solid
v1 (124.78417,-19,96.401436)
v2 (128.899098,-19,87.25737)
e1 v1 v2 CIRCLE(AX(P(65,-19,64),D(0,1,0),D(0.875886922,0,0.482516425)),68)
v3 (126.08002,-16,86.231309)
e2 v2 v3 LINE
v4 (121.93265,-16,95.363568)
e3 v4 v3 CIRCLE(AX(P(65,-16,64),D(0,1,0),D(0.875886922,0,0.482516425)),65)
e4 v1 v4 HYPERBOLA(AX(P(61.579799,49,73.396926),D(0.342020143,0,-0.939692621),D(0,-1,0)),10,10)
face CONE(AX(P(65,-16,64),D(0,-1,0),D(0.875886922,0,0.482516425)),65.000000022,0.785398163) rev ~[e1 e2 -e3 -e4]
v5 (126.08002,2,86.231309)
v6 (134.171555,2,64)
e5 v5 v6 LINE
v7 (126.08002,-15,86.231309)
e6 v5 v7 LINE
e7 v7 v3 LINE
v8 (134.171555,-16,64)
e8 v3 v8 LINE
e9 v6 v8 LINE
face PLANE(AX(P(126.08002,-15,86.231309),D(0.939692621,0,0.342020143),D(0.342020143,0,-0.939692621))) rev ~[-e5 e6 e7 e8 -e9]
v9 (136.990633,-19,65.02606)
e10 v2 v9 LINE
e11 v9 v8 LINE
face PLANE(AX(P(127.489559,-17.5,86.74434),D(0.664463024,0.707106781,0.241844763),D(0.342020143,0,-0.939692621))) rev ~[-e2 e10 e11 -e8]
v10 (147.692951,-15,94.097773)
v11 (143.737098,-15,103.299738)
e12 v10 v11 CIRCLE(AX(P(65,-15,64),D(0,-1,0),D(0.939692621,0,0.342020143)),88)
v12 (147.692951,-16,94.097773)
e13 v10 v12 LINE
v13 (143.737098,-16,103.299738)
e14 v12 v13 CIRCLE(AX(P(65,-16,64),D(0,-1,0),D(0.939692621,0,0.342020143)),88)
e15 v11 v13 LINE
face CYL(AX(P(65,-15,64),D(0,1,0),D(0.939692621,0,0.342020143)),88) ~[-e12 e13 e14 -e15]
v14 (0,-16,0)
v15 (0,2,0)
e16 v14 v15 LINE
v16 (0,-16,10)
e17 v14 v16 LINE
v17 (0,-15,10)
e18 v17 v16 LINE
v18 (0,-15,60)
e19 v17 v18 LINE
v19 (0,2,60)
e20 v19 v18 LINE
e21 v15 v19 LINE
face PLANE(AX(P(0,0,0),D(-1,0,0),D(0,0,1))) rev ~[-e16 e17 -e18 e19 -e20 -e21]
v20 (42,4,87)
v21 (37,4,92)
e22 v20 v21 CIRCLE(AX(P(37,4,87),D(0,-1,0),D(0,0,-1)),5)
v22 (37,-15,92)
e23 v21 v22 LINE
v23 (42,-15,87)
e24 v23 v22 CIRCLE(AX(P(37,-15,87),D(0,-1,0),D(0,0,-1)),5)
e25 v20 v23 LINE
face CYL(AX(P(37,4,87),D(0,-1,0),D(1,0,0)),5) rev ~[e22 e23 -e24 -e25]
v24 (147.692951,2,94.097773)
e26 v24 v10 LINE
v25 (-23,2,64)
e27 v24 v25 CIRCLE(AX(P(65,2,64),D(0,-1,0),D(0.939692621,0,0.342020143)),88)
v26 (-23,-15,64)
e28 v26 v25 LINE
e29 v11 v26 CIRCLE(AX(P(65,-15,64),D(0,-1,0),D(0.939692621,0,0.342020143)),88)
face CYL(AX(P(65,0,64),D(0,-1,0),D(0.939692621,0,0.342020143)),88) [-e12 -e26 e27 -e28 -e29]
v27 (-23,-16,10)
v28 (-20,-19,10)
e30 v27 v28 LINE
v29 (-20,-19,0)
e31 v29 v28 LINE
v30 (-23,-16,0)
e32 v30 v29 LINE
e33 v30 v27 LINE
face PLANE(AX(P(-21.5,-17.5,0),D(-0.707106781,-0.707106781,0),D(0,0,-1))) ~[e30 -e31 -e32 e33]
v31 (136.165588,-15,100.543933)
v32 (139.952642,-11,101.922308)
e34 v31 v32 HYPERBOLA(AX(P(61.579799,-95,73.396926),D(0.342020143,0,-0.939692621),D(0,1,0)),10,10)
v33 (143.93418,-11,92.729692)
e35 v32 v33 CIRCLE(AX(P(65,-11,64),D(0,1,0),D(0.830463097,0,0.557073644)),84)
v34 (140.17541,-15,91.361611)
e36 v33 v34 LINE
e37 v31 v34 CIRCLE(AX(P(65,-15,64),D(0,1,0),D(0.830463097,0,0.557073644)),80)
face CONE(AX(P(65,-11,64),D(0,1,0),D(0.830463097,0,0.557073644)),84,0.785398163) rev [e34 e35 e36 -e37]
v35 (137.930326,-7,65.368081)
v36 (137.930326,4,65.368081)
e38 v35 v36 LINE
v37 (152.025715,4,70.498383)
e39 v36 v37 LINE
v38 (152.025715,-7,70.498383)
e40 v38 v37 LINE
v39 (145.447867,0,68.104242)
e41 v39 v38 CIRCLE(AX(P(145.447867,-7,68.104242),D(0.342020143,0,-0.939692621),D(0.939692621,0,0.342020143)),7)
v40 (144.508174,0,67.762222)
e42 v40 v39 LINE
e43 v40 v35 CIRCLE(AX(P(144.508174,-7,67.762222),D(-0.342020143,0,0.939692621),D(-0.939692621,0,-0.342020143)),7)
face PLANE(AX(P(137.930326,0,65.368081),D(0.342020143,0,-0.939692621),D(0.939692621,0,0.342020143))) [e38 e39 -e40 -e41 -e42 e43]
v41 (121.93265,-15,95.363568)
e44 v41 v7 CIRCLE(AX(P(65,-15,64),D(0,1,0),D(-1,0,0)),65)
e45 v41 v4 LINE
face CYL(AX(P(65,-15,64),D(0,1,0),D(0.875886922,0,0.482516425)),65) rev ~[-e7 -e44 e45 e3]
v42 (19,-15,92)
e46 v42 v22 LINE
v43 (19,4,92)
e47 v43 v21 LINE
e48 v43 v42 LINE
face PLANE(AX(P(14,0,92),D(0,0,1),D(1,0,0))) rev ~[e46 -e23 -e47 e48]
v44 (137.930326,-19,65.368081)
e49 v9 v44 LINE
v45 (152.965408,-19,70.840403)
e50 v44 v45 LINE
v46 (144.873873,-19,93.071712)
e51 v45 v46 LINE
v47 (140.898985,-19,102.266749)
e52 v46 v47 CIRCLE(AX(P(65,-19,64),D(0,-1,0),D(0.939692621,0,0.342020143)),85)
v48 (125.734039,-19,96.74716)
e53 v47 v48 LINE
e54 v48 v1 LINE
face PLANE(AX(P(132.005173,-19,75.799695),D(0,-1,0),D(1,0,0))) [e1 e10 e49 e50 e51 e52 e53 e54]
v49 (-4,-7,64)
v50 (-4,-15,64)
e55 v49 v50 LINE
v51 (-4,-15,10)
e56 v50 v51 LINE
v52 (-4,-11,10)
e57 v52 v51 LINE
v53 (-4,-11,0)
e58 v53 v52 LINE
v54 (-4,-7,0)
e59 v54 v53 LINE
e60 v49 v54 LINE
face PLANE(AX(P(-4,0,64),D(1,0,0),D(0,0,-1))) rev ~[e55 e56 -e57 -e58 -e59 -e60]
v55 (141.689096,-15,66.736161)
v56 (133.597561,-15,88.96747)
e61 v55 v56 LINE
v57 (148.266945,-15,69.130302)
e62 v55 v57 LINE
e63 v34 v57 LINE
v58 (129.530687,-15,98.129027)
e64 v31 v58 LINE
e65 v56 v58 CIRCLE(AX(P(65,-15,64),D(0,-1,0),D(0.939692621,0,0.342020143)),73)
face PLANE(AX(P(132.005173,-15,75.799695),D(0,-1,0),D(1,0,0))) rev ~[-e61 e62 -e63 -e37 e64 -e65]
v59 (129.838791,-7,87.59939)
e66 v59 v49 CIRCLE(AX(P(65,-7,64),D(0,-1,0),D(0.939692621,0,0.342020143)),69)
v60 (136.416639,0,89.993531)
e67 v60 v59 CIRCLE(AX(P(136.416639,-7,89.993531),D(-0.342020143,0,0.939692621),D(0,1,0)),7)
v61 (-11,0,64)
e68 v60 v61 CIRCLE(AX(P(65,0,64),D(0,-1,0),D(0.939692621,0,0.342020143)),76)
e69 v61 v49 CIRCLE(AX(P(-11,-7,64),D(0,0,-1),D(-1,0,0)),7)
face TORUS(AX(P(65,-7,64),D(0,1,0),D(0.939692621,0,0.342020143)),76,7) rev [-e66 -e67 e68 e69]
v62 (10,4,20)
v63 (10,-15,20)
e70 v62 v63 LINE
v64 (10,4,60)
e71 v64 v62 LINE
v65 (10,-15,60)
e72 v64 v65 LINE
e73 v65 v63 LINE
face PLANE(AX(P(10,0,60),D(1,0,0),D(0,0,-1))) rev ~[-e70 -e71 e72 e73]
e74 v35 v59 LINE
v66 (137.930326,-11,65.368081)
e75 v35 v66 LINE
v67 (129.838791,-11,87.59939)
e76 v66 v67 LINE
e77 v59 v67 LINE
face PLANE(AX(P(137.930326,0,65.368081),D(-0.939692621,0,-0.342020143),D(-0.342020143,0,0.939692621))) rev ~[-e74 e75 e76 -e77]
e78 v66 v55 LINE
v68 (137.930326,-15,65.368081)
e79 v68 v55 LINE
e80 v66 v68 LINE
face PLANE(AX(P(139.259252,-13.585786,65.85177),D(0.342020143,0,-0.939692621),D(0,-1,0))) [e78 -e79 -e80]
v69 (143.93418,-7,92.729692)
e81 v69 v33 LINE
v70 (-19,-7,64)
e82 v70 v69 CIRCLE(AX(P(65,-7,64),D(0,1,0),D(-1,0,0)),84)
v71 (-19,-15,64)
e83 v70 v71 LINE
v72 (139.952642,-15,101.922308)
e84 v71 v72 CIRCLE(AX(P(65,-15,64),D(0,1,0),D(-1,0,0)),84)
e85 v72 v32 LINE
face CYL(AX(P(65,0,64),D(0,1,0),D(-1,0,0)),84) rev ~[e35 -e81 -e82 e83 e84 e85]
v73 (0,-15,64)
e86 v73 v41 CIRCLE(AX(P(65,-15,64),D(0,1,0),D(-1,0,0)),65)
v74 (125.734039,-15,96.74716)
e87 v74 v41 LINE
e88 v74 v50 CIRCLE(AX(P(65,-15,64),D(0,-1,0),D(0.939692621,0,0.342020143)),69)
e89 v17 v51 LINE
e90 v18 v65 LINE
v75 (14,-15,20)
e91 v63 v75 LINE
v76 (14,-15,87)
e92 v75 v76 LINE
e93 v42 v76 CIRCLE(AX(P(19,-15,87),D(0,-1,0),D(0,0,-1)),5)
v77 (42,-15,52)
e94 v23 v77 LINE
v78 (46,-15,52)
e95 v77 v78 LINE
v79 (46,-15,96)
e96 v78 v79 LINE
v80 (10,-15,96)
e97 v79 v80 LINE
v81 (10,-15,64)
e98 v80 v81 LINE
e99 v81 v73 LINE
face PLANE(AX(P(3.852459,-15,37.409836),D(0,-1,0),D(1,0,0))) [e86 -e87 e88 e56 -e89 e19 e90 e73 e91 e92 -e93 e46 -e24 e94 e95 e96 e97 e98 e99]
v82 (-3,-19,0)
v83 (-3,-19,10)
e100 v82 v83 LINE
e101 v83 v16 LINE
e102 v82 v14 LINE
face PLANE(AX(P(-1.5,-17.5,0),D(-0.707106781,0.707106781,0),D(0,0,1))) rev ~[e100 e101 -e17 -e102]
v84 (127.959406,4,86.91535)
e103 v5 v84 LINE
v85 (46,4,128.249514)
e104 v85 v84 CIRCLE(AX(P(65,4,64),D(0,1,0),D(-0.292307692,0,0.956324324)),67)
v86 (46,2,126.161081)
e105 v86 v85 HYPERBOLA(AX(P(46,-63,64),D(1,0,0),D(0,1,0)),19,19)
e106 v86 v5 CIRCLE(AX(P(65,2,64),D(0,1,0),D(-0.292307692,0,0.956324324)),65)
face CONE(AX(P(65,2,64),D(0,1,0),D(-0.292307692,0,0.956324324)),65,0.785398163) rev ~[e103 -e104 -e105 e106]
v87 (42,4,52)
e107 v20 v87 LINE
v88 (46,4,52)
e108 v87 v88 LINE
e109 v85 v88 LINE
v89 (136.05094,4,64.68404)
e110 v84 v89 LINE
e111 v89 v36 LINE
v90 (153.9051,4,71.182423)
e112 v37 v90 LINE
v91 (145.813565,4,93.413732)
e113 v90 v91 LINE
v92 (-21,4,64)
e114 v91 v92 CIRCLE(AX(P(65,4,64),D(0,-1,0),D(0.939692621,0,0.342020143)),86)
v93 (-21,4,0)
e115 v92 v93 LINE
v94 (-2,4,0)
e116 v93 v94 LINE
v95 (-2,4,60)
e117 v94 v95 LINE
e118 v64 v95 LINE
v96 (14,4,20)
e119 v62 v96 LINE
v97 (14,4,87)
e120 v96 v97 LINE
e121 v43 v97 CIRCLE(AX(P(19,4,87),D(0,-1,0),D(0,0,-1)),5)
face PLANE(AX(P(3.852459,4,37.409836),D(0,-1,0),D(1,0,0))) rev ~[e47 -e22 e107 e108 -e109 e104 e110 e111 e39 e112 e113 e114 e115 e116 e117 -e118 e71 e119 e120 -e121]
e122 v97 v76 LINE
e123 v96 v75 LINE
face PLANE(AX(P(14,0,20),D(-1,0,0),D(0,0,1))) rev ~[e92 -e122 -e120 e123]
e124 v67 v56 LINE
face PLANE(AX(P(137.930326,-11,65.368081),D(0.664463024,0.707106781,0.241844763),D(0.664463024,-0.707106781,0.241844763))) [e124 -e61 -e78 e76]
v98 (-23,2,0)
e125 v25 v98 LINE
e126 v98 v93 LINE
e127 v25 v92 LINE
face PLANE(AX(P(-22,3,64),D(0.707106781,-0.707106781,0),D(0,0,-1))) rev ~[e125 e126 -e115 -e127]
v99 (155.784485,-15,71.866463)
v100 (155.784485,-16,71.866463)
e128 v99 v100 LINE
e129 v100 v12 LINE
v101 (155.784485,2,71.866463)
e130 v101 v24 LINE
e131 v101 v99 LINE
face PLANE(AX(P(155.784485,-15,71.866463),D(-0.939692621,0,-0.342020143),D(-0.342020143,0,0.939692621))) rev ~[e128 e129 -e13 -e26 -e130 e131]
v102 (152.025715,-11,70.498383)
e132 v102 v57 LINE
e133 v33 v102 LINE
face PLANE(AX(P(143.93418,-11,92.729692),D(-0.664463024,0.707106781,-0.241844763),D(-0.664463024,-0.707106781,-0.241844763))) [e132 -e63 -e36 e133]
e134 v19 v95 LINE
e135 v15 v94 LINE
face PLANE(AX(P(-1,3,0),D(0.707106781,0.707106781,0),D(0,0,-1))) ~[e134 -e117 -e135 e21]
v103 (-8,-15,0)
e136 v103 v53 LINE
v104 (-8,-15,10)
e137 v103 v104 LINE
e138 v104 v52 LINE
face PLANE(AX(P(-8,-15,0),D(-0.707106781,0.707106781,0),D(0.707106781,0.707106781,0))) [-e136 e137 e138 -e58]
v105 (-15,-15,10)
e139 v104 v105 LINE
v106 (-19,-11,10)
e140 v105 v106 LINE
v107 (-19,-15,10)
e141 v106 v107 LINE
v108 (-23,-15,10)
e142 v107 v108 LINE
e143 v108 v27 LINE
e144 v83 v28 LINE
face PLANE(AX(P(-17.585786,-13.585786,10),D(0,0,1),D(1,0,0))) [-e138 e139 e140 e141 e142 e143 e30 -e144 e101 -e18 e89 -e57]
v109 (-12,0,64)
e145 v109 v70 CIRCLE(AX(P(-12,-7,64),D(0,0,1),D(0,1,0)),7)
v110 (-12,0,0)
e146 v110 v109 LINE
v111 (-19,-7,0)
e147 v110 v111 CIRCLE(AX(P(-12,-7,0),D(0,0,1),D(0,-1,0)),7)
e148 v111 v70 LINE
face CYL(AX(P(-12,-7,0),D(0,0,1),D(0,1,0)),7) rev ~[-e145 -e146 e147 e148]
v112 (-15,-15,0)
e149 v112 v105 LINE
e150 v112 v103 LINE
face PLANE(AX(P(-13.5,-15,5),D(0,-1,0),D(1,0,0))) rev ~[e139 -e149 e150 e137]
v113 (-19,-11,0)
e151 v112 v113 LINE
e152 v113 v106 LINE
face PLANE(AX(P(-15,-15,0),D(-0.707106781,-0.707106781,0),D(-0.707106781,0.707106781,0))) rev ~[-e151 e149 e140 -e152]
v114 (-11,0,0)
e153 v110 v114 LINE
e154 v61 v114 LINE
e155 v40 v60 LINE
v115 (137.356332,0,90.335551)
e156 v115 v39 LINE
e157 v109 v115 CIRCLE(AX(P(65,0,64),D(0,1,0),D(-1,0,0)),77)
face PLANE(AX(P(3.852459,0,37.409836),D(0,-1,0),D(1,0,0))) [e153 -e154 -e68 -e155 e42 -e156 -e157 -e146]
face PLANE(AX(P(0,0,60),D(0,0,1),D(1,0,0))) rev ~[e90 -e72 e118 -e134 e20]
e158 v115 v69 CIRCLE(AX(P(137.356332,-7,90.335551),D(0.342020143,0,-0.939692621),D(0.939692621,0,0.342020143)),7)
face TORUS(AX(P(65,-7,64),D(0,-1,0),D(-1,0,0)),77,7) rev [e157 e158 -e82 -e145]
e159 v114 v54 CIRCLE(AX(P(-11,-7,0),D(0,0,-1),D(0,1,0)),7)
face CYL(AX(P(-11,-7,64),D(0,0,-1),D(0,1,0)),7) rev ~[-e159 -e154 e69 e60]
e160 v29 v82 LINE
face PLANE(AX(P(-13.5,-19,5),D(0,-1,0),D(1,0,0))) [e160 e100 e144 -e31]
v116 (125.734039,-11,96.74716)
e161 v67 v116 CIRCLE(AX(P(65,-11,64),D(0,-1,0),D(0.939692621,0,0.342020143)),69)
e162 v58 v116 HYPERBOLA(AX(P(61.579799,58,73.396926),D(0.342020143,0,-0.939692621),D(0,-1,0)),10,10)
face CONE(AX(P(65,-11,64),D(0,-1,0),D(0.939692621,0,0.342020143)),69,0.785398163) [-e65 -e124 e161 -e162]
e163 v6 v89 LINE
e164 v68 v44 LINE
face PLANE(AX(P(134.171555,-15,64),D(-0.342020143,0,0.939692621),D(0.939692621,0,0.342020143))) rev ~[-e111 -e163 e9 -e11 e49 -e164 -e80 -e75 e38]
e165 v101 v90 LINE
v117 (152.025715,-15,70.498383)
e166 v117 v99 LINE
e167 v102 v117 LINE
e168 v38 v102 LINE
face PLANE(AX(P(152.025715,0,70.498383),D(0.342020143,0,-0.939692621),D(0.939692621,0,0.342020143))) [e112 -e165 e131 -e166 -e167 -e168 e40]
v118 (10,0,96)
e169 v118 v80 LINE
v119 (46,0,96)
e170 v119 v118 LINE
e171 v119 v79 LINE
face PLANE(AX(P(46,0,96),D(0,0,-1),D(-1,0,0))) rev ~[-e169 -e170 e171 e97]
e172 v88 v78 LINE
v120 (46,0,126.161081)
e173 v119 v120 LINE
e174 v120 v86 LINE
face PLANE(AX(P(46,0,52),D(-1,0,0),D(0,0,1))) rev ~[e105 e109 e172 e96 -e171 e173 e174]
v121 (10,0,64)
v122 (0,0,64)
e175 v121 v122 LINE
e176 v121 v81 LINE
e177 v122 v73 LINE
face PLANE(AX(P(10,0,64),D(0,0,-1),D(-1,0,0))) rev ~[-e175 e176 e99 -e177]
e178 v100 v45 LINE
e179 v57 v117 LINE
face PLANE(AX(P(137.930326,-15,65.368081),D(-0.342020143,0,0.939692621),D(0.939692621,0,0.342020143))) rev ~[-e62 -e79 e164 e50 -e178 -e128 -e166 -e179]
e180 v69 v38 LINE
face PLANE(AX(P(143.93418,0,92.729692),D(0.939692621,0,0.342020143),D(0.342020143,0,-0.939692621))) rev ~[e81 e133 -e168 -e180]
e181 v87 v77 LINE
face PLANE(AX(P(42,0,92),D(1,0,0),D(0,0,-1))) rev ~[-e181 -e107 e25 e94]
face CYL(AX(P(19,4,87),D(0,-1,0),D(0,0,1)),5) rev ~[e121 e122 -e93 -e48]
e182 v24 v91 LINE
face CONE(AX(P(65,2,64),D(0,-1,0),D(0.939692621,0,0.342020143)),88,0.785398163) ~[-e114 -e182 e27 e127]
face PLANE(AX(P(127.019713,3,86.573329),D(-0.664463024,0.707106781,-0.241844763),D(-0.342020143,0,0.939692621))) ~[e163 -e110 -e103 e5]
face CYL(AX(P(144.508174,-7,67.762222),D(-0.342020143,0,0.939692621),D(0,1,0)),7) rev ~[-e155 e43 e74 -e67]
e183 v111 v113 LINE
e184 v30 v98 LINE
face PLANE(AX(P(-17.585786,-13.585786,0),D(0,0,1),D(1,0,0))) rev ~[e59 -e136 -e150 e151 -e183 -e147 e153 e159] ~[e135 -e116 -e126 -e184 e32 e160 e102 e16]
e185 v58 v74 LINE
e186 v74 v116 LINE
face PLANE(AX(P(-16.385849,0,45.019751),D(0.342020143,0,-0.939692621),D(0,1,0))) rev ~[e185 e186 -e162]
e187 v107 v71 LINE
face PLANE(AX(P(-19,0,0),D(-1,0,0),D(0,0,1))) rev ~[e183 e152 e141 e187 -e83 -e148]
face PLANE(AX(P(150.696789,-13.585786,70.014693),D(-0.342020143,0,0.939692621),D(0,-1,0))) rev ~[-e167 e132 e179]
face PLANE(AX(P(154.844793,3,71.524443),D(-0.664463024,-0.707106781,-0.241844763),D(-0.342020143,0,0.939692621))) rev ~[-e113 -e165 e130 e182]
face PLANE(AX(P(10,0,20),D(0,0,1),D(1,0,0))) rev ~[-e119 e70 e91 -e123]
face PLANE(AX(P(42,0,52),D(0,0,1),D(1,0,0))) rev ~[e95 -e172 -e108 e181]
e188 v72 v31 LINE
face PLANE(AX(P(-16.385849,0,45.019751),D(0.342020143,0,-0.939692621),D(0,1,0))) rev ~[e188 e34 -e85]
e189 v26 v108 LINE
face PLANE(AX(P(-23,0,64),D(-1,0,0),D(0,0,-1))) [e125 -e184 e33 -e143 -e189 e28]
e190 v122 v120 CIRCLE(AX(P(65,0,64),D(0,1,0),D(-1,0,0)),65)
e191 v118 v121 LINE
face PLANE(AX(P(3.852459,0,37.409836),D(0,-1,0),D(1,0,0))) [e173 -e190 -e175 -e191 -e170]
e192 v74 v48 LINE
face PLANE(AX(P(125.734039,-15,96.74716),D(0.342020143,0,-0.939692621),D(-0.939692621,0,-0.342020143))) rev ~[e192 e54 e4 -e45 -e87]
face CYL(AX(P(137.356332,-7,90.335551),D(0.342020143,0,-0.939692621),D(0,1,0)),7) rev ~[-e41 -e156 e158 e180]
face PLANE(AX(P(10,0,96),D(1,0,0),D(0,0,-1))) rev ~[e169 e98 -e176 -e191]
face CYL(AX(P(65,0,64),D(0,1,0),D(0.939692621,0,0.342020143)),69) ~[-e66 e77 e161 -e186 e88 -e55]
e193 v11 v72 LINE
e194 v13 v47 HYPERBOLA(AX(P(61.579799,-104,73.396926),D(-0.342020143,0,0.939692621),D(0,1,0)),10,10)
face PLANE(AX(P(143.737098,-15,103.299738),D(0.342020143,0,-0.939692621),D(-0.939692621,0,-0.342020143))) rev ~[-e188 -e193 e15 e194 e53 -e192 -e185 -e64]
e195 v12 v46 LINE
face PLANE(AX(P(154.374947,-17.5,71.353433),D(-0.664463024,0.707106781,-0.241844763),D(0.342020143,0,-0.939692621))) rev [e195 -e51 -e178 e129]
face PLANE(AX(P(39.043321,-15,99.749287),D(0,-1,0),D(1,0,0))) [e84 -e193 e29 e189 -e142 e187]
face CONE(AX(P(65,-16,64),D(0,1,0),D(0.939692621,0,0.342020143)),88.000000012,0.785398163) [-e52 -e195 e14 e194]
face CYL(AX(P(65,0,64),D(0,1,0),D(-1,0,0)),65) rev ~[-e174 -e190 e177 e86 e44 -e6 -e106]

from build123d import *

# Parameters (mm, degrees)
F1_DEPTH     = 4
F2_DEPTH     = 15
F3_R         = 7
F4_SIZE      = 2
F5_W         = 19
F5_H         = 10
F5_W_2       = 4
F6_DEPTH     = 4
F7_T1_DEPTH  = 10
F7_T3_DEPTH  = 23.6580652273
F7_T5_DEPTH  = 23.6580652273
F7_T10_ANGLE = 16.8749432134
F7_T15_ANGLE = 13.853661309
F8_SIZE      = 3
F9_R         = 5


# Not quite as in the source:
# - a fillet or chamfer that OpenCascade refuses, or shapes differently, is made with other operations: its cross-section is extruded or revolved along the edge and cut away or added


with BuildPart() as f1:
    # F0 (on Front) → F1 (new body)
    with BuildSketch(Plane.XZ):
        Polygon((0, 0), (0, 60), (10, 60), (10, 20), (14, 20), (14, 64), (10, 64), (0, 64), (-4, 64), (-4, 0), align=None)
        with BuildLine():
            Line((-19, 0), (-4, 0))
            Line((-4, 0), (-4, 64))
            ThreePointArc((-4, 64), (53.018275741, 131.9517349578), (129.8387908342, 87.5993898895))
            Line((129.8387908342, 87.5993898895), (143.934180146, 92.7296920394))
            ThreePointArc((143.934180146, 92.7296920394), (50.413553076, 146.723851253), (-19, 64))
            Line((-19, 64), (-19, 0))
        make_face()
        with BuildLine():
            ThreePointArc((129.8387908342, 87.5993898895), (53.018275741, 131.9517349578), (-4, 64))
            Line((-4, 64), (0, 64))
            ThreePointArc((0, 64), (12.7505980895, 102.6652298584), (46, 126.1610810717))
            ThreePointArc((46, 126.1610810717), (94.0048047106, 122.1697627956), (126.0800203511, 86.2313093162))
            Line((126.0800203511, 86.2313093162), (129.8387908342, 87.5993898895))
        make_face()
        with BuildLine():
            Line((-23, 0), (-19, 0))
            Line((-19, 0), (-19, 64))
            ThreePointArc((-19, 64), (50.413553076, 146.723851253), (143.934180146, 92.7296920394))
            Line((143.934180146, 92.7296920394), (147.6929506292, 94.0977726127))
            ThreePointArc((147.6929506292, 94.0977726127), (49.7189603653, 150.6630822651), (-23, 64))
            Line((-23, 64), (-23, 0))
        make_face()
        Polygon((10, 64), (14, 64), (14, 92), (42, 92), (42, 52), (46, 52), (46, 92), (46, 96), (10, 96), (10, 92), align=None)
        with BuildLine():
            ThreePointArc((46, 126.1610810717), (12.7505980895, 102.6652298584), (0, 64))
            Line((0, 64), (10, 64))
            Line((10, 64), (10, 92))
            Line((10, 92), (10, 96))
            Line((10, 96), (46, 96))
            Line((46, 96), (46, 126.1610810717))
        make_face()
        Polygon((137.9303256941, 65.3680805733), (129.8387908342, 87.5993898895), (126.0800203511, 86.2313093162), (134.1715552109, 64), align=None)
        Polygon((143.934180146, 92.7296920394), (129.8387908342, 87.5993898895), (137.9303256941, 65.3680805733), (152.0257150059, 70.4983827232), align=None)
        Polygon((147.6929506292, 94.0977726127), (143.934180146, 92.7296920394), (152.0257150059, 70.4983827232), (155.784485489, 71.8664632965), align=None)
    extrude(amount=-F1_DEPTH)

    # F0 (on Front) → F2 (join)
    with BuildSketch(Plane.XZ):
        Polygon((0, 0), (0, 60), (10, 60), (10, 20), (14, 20), (14, 64), (10, 64), (0, 64), (-4, 64), (-4, 0), align=None)
        with BuildLine():
            ThreePointArc((129.8387908342, 87.5993898895), (53.018275741, 131.9517349578), (-4, 64))
            Line((-4, 64), (0, 64))
            ThreePointArc((0, 64), (12.7505980895, 102.6652298584), (46, 126.1610810717))
            ThreePointArc((46, 126.1610810717), (94.0048047106, 122.1697627956), (126.0800203511, 86.2313093162))
            Line((126.0800203511, 86.2313093162), (129.8387908342, 87.5993898895))
        make_face()
        with BuildLine():
            Line((-23, 0), (-19, 0))
            Line((-19, 0), (-19, 64))
            ThreePointArc((-19, 64), (50.413553076, 146.723851253), (143.934180146, 92.7296920394))
            Line((143.934180146, 92.7296920394), (147.6929506292, 94.0977726127))
            ThreePointArc((147.6929506292, 94.0977726127), (49.7189603653, 150.6630822651), (-23, 64))
            Line((-23, 64), (-23, 0))
        make_face()
        Polygon((147.6929506292, 94.0977726127), (143.934180146, 92.7296920394), (152.0257150059, 70.4983827232), (155.784485489, 71.8664632965), align=None)
        Polygon((137.9303256941, 65.3680805733), (129.8387908342, 87.5993898895), (126.0800203511, 86.2313093162), (134.1715552109, 64), align=None)
        Polygon((10, 64), (14, 64), (14, 92), (42, 92), (42, 52), (46, 52), (46, 92), (46, 96), (10, 96), (10, 92), align=None)
    extrude(amount=F2_DEPTH)

    # F3
    f3_edges = [f1.edges().sort_by_distance(p)[0] for p in [
        (50.413553, 0, 146.723851),
        (53.018276, 0, 131.951735),
        (133.884558, 0, 76.483735),
        (147.979948, 0, 81.614037),
        (-19, 0, 32),
        (-4, 0, 32),
    ]]
    fillet(f3_edges, radius=F3_R)

    # F4
    f4_edges = [f1.edges().sort_by_distance(p)[0] for p in [
        (130.125788, 4, 75.115655),
        (151.738718, 4, 82.982118),
        (0, 4, 30),
        (94.004805, 4, 122.169763),
        (49.71896, 4, 150.663082),
        (-23, 4, 32),
    ]]
    chamfer(f4_edges, length=F4_SIZE)

    # F5 (on face) → F6 (join)
    with BuildSketch(Plane.XZ.offset(15)):
        Polygon((137.9303256941, 65.3680805733), (129.8387908342, 87.5993898895), (126.0800203511, 86.2313093162), (134.1715552109, 64), align=None)
        Polygon((147.6929506292, 94.0977726127), (129.8387908342, 87.5993898895), (137.9303256941, 65.3680805733), (155.784485489, 71.8664632965), align=None)
        with Locations((-13.5, 5)):
            Rectangle(F5_W, F5_H)
        with Locations((-2, 5)):
            Rectangle(F5_W_2, F5_H)
        with BuildLine():
            Line((143.7370980696, 103.2997377546), (125.7340390711, 96.7471601534))
            ThreePointArc((125.7340390711, 96.7471601534), (127.95279444, 92.2479321755), (129.8387908342, 87.5993898895))
            Line((129.8387908342, 87.5993898895), (147.6929506292, 94.0977726127))
            ThreePointArc((147.6929506292, 94.0977726127), (145.8460524475, 98.7550831341), (143.7370980696, 103.2997377546))
        make_face()
        with BuildLine():
            ThreePointArc((129.8387908342, 87.5993898895), (127.95279444, 92.2479321755), (125.7340390711, 96.7471601534))
            Line((125.7340390711, 96.7471601534), (121.932649899, 95.3635676459))
            ThreePointArc((121.932649899, 95.3635676459), (124.1827434345, 90.8775534519), (126.0800203511, 86.2313093162))
            Line((126.0800203511, 86.2313093162), (129.8387908342, 87.5993898895))
        make_face()
    extrude(amount=F6_DEPTH)

    # F7: chamfer of 4 on 6 edges, made by hand

    # F7_s2 → F7_t1 (join)
    with BuildSketch(Plane.XY):
        Polygon((-15, -15), (-19, -11), (-19, -15), align=None)
        Polygon((-8, -15), (-4, -11), (-4, -15), align=None)
    extrude(amount=F7_T1_DEPTH)

    # F7_s4 → F7_t3 (join)
    with BuildSketch(Plane(origin=(-12.9656479113, 0, 35.622824865), x_dir=(0, 1, 0), z_dir=(0.3420201433, 0, -0.9396926208))):
        Polygon((-11, 166.9693095239), (-15, 162.9693095239), (-15, 166.9693095239), align=None)
    extrude(amount=F7_T3_DEPTH)

    # F7_s6 → F7_t5 (join)
    with BuildSketch(Plane(origin=(-4.8741130515, 0, 13.3915155488), x_dir=(0, 1, 0), z_dir=(-0.3420201433, 0, 0.9396926208))):
        Polygon((-11, -151.9693095239), (-15, -155.9693095239), (-15, -151.9693095239), align=None)
    extrude(amount=F7_T5_DEPTH)


with BuildPart() as f7_tool8:
    # F7_s9 → F7_t10 (revolve)
    with BuildSketch(Plane(origin=(-12.9656479113, 0, 35.622824865), x_dir=(0, 1, 0), z_dir=(0.3420201433, 0, -0.9396926208))):
        Polygon((-11, 151.9693095239), (-15, 155.9693095239), (-15, 151.9693095239), align=None)
    revolve(axis=Axis((65, -15, 64), (0, -1, 0)), revolution_arc=F7_T10_ANGLE)

    split(bisect_by=Plane(origin=(-16.3858493446, 0, 45.0197510729), x_dir=(0, 1, 0), z_dir=(0.3420201433, 0, -0.9396926208)), keep=Keep.TOP)


with BuildPart() as f1_1:
    add(f1.part)

    # F7_t7: union F7_tool8
    add(f7_tool8.part)


with BuildPart() as f7_tool13:
    # F7_s14 → F7_t15 (revolve)
    with BuildSketch(Plane(origin=(-9.4367447279, 0, 14.0679214359), x_dir=(0, 1, 0), z_dir=(-0.5570736436, 0, 0.830463097))):
        Polygon((-11, -173.6328145012), (-15, -169.6328145012), (-15, -173.6328145012), align=None)
    revolve(axis=Axis((65, -15, 64), (0, 1, 0)), revolution_arc=F7_T15_ANGLE)

    split(bisect_by=Plane(origin=(-16.3858493446, 0, 45.0197510729), x_dir=(0, 1, 0), z_dir=(0.3420201433, 0, -0.9396926208)), keep=Keep.TOP)


with BuildPart() as f1_2:
    add(f1_1.part)

    # F7_t12: union F7_tool13
    add(f7_tool13.part)

    # F8
    f8_edges = [f1_2.edges().sort_by_distance(p)[0] for p in [
        (-23, -19, 5),
        (0, -19, 5),
        (124.182743, -19, 90.877553),
        (145.846052, -19, 98.755083),
        (130.125788, -19, 75.115655),
        (151.738718, -19, 82.982118),
    ]]
    chamfer(f8_edges, length=F8_SIZE)

    # F9
    f9_edges = [f1_2.edges().sort_by_distance(p)[0] for p in [
        (42, -5.5, 92),
        (14, -5.5, 92),
    ]]
    fillet(f9_edges, radius=F9_R)


solid = f1_2.part
